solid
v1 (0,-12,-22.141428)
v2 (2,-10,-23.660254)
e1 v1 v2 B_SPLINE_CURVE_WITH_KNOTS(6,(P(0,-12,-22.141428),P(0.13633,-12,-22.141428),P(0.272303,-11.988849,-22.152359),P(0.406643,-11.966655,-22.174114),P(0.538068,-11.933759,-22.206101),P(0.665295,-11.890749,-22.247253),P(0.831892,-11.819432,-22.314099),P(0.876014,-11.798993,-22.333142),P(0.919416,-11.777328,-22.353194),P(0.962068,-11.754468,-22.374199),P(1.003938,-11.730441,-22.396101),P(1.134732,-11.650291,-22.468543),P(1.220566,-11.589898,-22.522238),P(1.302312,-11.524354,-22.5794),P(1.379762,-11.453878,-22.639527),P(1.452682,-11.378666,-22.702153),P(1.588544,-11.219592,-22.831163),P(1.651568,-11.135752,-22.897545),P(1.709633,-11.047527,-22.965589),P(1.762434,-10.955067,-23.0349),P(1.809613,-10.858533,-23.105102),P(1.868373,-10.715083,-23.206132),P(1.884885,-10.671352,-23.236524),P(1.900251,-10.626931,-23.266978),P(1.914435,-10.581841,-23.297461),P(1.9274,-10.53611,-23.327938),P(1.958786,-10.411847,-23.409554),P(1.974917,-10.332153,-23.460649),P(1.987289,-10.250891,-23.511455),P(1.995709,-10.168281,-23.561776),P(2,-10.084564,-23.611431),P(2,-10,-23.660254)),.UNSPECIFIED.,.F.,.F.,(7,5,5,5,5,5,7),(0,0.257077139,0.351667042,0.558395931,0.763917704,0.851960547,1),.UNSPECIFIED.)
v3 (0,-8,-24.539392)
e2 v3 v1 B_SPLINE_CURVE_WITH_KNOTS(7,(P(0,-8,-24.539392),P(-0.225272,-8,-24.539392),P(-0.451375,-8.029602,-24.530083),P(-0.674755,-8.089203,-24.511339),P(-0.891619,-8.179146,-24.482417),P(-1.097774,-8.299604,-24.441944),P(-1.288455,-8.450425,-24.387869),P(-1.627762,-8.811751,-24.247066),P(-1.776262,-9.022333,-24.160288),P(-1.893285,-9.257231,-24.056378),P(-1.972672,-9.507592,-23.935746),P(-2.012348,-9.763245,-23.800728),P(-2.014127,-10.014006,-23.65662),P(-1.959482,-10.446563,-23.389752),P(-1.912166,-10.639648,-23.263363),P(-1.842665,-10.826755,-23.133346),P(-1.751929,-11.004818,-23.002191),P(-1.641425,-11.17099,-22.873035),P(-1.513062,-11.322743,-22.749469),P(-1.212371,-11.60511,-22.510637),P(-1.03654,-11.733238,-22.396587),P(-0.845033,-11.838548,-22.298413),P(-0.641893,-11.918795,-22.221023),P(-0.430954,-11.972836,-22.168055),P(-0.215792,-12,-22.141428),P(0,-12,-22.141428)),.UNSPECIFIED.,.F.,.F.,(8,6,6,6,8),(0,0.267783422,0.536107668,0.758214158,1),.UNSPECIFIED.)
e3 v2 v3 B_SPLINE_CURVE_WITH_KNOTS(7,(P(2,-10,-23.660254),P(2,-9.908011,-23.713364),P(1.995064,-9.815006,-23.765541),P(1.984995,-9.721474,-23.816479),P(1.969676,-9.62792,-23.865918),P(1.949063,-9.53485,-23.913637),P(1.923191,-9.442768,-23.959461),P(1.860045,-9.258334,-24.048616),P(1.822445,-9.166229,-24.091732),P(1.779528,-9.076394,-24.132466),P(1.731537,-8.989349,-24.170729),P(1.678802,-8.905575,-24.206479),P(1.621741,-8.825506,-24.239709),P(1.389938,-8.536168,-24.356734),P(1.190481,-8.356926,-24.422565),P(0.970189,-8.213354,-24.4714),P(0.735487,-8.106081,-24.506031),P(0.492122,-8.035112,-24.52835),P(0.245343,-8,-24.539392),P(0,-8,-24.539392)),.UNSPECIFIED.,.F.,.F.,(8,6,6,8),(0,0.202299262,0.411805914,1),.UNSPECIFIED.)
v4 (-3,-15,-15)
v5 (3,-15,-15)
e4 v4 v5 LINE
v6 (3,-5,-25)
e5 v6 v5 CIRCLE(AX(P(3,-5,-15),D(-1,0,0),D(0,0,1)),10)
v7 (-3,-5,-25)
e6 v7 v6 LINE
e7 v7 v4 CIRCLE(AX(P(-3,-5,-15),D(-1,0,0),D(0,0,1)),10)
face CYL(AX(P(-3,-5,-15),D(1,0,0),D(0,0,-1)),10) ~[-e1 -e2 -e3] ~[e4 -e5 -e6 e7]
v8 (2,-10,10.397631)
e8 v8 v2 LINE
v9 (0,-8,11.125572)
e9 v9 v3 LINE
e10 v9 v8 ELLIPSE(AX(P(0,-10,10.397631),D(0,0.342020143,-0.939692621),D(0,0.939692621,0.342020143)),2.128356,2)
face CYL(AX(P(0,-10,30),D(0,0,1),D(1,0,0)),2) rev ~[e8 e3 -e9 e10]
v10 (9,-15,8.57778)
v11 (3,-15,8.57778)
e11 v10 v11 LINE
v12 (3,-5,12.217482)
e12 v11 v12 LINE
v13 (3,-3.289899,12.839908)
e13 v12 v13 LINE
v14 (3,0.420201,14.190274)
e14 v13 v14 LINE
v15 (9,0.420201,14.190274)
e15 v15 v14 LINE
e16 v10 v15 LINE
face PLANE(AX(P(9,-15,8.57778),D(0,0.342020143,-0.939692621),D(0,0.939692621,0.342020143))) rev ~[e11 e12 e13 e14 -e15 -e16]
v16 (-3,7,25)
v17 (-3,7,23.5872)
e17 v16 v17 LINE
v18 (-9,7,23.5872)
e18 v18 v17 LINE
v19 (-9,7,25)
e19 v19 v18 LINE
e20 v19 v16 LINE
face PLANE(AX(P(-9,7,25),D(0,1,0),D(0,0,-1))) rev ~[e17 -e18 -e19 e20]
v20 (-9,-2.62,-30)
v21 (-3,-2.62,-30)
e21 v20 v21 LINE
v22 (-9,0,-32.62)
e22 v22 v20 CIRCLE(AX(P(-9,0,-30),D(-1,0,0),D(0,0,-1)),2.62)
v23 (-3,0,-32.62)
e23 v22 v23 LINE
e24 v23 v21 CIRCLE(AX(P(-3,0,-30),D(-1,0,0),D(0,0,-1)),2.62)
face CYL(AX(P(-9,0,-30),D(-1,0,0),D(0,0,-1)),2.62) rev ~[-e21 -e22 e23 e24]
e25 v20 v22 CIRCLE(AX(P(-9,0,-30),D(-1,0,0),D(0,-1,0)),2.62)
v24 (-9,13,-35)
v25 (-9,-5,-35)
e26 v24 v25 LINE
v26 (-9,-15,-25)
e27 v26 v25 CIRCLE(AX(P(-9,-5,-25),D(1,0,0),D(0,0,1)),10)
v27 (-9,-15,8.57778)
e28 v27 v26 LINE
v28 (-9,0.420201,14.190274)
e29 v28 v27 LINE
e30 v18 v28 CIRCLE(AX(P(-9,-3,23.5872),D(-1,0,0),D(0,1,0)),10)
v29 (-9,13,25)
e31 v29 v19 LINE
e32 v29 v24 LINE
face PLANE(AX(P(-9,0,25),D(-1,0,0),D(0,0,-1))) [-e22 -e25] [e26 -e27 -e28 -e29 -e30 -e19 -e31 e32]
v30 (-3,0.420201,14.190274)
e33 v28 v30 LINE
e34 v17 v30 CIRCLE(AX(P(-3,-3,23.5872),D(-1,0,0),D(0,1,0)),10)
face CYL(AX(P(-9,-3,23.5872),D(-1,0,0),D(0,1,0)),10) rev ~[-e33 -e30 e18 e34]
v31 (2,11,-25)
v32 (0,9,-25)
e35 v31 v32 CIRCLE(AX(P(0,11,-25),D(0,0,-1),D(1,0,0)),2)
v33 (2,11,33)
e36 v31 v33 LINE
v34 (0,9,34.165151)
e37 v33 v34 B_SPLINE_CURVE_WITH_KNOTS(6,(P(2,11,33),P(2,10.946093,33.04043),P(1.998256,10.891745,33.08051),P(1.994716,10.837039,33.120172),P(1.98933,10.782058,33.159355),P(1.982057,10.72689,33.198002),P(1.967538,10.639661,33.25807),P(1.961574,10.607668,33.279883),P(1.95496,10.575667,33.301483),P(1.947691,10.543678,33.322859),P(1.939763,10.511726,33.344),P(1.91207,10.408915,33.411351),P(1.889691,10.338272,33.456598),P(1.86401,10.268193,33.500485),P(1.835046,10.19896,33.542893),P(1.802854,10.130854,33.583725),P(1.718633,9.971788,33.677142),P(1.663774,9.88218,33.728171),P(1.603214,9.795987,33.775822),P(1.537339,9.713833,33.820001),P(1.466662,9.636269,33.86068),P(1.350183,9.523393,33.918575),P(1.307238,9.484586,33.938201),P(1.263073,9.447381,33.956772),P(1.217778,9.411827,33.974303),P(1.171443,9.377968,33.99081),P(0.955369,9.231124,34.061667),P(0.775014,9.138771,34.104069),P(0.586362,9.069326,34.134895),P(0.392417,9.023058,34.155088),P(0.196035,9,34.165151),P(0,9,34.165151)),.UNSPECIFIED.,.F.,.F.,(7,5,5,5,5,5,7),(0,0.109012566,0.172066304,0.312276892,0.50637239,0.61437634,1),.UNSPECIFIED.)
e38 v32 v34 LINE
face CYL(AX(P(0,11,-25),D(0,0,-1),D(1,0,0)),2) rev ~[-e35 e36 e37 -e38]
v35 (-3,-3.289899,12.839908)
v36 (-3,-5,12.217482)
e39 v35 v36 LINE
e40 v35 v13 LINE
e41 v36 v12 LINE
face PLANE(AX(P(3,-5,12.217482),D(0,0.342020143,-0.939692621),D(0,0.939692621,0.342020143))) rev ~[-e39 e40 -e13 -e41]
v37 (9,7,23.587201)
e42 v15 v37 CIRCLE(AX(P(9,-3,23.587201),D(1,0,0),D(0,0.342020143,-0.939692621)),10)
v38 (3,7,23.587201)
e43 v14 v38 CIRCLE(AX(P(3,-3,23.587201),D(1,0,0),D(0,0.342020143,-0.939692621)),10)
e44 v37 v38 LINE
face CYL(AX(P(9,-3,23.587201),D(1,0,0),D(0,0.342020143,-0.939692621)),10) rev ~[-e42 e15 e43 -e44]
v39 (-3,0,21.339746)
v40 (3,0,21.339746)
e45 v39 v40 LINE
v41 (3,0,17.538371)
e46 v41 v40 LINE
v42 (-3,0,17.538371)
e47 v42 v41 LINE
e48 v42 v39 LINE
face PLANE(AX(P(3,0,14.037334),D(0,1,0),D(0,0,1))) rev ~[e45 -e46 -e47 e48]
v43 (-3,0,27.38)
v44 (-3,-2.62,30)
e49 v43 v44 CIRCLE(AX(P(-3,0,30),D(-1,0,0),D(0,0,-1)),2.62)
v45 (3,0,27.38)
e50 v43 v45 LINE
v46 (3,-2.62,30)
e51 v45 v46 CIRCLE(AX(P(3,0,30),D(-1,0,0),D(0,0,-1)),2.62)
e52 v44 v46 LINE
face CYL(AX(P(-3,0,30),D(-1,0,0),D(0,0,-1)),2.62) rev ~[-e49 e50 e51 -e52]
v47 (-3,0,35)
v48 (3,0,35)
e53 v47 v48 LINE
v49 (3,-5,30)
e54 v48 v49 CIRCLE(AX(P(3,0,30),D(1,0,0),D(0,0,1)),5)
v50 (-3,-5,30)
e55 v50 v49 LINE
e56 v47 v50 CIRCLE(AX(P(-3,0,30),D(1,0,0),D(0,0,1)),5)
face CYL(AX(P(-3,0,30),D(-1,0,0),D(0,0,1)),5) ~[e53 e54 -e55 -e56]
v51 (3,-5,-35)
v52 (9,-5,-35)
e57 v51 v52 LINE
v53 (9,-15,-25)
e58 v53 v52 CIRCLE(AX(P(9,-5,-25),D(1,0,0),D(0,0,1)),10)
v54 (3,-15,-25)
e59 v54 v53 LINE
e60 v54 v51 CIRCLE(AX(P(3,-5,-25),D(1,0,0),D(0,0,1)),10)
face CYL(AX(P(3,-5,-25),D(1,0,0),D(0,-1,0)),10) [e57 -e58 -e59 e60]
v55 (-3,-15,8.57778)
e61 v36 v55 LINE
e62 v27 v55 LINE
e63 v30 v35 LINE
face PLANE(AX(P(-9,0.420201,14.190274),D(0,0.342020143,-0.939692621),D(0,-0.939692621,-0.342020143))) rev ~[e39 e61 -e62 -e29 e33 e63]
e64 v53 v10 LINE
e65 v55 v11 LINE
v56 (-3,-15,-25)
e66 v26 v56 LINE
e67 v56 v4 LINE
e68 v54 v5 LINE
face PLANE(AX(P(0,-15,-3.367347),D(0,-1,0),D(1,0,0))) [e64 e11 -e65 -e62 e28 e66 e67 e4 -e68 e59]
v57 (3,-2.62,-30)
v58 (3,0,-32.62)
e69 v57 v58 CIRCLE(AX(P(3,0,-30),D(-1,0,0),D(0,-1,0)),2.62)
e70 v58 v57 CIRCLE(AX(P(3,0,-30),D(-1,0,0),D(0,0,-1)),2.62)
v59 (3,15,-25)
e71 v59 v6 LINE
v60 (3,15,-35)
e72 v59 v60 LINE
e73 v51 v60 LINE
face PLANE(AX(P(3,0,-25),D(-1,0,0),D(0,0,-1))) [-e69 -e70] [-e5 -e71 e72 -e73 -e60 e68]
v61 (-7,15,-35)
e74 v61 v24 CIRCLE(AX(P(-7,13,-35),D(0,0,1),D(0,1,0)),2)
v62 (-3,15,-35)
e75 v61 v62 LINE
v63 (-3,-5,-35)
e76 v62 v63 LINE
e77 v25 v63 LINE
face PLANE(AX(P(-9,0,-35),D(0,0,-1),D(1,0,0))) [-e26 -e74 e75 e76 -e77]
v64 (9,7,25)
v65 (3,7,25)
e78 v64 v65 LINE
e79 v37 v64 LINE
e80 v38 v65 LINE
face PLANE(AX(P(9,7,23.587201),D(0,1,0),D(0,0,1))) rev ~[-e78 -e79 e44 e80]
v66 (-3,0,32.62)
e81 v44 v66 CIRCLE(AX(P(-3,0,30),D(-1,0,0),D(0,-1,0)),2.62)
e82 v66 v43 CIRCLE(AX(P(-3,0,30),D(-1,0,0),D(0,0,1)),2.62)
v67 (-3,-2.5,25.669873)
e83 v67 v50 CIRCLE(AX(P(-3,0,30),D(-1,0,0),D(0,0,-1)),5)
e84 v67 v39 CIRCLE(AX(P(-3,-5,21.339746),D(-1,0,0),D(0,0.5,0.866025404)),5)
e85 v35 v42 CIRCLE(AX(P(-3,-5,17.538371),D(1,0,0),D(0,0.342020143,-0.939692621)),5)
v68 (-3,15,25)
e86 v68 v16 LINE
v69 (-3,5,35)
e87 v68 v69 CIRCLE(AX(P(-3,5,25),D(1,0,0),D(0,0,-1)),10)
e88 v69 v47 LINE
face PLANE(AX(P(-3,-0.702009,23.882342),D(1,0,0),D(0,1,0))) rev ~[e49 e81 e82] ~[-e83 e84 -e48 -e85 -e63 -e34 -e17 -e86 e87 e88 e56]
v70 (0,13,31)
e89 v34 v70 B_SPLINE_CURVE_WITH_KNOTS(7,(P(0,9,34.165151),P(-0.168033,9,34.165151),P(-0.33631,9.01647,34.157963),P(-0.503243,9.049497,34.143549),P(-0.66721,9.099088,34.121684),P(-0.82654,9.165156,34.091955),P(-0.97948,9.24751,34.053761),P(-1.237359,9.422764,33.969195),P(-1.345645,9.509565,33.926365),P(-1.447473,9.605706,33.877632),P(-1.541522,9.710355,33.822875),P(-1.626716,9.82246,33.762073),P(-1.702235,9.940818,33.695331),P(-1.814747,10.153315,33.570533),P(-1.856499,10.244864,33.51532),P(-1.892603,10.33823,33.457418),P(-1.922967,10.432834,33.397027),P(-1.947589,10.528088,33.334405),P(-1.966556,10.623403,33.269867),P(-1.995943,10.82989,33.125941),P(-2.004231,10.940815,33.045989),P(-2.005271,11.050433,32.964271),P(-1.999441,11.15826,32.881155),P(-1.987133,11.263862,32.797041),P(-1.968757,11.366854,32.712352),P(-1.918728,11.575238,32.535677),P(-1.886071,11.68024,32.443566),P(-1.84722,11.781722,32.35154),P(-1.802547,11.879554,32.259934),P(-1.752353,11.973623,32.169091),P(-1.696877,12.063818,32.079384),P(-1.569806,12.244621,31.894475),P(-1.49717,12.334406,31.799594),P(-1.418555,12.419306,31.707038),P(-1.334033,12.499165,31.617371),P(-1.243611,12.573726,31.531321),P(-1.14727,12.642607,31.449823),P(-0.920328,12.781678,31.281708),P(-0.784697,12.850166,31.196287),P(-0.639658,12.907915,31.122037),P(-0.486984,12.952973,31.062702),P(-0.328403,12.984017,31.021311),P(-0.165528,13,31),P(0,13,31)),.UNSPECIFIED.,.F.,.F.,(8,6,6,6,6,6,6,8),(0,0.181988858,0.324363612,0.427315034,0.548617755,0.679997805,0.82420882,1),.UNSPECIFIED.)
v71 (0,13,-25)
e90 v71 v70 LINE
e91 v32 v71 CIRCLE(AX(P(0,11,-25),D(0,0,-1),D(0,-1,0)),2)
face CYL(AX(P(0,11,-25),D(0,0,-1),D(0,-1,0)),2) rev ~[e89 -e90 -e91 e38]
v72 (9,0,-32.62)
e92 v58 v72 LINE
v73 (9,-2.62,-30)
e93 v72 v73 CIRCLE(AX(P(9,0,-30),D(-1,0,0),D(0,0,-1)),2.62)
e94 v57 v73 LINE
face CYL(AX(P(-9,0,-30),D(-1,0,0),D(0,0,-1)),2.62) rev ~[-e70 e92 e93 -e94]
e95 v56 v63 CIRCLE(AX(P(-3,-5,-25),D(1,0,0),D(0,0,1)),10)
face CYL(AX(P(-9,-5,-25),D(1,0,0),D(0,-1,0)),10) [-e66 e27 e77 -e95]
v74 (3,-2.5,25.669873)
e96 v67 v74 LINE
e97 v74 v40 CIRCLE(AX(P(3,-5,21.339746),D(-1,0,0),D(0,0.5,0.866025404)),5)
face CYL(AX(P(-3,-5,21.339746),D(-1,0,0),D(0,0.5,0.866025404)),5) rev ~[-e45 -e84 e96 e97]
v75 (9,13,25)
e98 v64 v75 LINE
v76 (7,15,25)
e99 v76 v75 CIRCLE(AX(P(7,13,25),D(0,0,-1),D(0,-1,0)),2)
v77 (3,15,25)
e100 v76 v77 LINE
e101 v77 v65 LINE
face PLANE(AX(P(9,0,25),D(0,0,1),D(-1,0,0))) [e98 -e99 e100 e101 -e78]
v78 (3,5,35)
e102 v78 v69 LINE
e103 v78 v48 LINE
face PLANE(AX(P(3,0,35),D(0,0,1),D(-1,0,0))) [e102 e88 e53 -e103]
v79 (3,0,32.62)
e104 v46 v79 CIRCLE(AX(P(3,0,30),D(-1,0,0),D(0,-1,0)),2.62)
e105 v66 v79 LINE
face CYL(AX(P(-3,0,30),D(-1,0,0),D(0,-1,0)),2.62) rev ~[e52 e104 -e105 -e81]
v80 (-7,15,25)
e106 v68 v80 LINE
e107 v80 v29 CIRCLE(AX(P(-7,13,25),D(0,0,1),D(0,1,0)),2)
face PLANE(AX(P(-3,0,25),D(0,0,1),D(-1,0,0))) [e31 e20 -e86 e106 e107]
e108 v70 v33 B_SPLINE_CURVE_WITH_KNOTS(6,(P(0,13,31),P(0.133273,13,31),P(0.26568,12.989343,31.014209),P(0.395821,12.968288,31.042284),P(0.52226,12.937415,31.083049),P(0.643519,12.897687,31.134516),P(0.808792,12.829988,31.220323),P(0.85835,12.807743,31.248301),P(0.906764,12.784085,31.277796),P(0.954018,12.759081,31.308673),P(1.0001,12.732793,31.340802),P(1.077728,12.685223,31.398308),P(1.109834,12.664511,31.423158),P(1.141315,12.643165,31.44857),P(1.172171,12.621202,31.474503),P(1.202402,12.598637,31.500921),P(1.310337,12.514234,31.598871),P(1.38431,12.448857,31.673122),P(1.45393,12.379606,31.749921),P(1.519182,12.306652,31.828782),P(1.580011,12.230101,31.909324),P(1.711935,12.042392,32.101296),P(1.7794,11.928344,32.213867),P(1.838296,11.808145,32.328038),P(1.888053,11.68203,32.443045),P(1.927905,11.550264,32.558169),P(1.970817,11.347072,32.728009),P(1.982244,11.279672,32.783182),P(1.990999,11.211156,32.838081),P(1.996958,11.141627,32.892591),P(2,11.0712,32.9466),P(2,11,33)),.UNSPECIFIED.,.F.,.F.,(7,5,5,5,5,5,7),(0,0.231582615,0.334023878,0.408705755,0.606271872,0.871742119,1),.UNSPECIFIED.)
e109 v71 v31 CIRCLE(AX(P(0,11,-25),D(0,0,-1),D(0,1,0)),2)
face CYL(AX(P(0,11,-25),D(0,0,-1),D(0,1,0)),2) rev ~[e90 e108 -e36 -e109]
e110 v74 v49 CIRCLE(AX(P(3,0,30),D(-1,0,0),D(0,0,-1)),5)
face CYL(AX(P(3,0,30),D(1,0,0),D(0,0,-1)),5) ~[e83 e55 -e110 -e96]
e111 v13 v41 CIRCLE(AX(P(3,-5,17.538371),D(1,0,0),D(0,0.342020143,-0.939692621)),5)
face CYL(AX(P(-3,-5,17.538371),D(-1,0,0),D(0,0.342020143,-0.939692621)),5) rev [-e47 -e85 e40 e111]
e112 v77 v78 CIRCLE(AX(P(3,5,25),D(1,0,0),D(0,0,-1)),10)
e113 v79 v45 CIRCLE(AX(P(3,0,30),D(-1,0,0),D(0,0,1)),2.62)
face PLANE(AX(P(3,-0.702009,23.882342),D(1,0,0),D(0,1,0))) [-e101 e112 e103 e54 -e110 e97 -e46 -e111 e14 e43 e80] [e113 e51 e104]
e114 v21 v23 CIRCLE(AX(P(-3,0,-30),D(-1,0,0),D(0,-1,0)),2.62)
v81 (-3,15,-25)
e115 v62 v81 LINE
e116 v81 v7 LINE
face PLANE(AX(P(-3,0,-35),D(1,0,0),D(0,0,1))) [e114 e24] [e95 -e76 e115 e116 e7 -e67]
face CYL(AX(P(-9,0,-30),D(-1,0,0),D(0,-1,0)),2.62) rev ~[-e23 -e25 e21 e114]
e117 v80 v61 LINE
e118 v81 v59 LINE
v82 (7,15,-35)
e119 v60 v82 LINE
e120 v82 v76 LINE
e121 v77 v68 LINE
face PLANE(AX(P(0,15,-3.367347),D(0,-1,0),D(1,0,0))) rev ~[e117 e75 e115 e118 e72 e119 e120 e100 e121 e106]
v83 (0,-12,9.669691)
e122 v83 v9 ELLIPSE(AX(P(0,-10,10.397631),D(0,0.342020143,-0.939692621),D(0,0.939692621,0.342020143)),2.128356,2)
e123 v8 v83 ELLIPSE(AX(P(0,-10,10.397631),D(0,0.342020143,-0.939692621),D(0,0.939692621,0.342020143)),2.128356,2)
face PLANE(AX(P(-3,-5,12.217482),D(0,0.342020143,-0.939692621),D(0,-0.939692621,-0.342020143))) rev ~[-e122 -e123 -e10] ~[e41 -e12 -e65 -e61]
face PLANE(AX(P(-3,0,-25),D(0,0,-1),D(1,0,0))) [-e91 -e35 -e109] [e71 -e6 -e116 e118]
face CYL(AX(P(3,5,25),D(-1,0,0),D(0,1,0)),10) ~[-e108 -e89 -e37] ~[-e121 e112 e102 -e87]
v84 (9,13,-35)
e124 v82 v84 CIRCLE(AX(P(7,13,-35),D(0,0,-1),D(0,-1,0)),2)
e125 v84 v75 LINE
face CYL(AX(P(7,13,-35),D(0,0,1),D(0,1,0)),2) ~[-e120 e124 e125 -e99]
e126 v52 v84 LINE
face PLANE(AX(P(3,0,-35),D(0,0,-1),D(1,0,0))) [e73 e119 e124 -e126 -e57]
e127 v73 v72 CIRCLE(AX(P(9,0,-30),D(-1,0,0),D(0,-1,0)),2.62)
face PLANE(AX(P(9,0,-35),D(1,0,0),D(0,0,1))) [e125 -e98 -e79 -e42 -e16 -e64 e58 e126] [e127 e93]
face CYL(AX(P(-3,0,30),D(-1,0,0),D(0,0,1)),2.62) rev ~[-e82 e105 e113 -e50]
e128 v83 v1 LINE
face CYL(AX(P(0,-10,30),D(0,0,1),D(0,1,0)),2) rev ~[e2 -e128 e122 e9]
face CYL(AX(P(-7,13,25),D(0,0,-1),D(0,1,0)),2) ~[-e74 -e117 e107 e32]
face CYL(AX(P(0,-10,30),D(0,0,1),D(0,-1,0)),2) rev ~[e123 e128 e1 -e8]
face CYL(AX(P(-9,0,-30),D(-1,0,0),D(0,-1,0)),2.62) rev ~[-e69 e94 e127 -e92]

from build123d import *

# Parameters (mm, degrees)
F1_DEPTH     = 15
F3_DEPTH     = 6
F5_DEPTH     = 18
F6_R         = 10
F9_DEPTH     = 6
F10_DEPTH    = 6
F11_R        = 2
F13_DEPTH    = 6
F15_R        = 10
F19_DEPTH    = 65.001
F21_DEPTH    = 60.001
F23_DEPTH    = 6
F24_T1_DEPTH = 6


# Not quite as in the source:
# - a fillet or chamfer that OpenCascade refuses, or shapes differently, is made with other operations: its cross-section is extruded or revolved along the edge and cut away or added


with BuildPart() as f1:
    # F0 (on Front) → F1 (new body, symmetric)
    with BuildSketch(Plane.XZ):
        Polygon((9, -25), (9, 25), (3, 25), (3, 35), (-3, 35), (-3, 25), (-9, 25), (-9, -25), (-9, -35), (-3, -35), (-3, -25), (3, -25), (3, -35), (9, -35), align=None)
    extrude(amount=F1_DEPTH, both=True)

    # F2 (on face) → F3 (cut)
    with BuildSketch(Plane(origin=(-3, 0, 0), x_dir=(0, -1, 0), z_dir=(-1, 0, 0))):
        with BuildLine():
            ThreePointArc((0, 32.62), (-2.62, 30), (0, 27.38))
            Line((0, 27.38), (0, 32.62))
        make_face()
        with BuildLine():
            Line((0, 32.62), (0, 27.38))
            ThreePointArc((0, 27.38), (1.8526197667, 28.1473802333), (2.62, 30))
            ThreePointArc((2.62, 30), (1.8526197667, 31.8526197667), (0, 32.62))
        make_face()
    extrude(amount=-F3_DEPTH, mode=Mode.SUBTRACT)

    # F4 (on face) → F5 (cut)
    with BuildSketch(Plane(origin=(-9, 0, 0), x_dir=(0, -1, 0), z_dir=(-1, 0, 0))):
        with BuildLine():
            ThreePointArc((0, -32.62), (1.8526197667, -31.8526197667), (2.62, -30))
            ThreePointArc((2.62, -30), (-1.8526197667, -28.1473802333), (0, -32.62))
        make_face()
    extrude(amount=-F5_DEPTH, mode=Mode.SUBTRACT)

    # F6
    f6_edges = [f1.edges().sort_by_distance(p)[0] for p in [
        (0, 15, 35),
        (0, -15, 35),
        (6, -15, -35),
        (-6, -15, -35),
    ]]
    fillet(f6_edges, radius=F6_R)

    # F8 (on face) → F9 (cut)
    with BuildSketch(Plane(origin=(-9, 0, 0), x_dir=(0, -1, 0), z_dir=(-1, 0, 0))):
        with BuildLine():
            ThreePointArc((-7, 23.5872004348), (-5.1915204429, 17.8514360713), (-0.4202014333, 14.190274227))
            Line((-0.4202014333, 14.190274227), (15, 8.5777798989))
            Line((15, 8.5777798989), (15, 25))
            Line((15, 25), (-7, 25))
            Line((-7, 25), (-7, 23.5872004348))
        make_face()
    extrude(amount=-F9_DEPTH, mode=Mode.SUBTRACT)

    # F7 (on face) → F10 (cut)
    with BuildSketch(Plane.YZ.offset(9)):
        with BuildLine():
            Line((7, 25), (-15, 25))
            Line((-15, 25), (-15, 8.57778))
            Line((-15, 8.57778), (0.4202014333, 14.1902743281))
            ThreePointArc((0.4202014333, 14.1902743281), (5.1915204429, 17.8514361724), (7, 23.587200536))
            Line((7, 23.587200536), (7, 25))
        make_face()
    extrude(amount=-F10_DEPTH, mode=Mode.SUBTRACT)

    # F11
    f11_edges = [f1.edges().sort_by_distance(p)[0] for p in [
        (9, 15, -5),
        (-9, 15, -5),
    ]]
    fillet(f11_edges, radius=F11_R)

    # F12 (on face) → F13 (cut)
    with BuildSketch(Plane(origin=(-3, 0, 0), x_dir=(0, -1, 0), z_dir=(-1, 0, 0))):
        with BuildLine():
            Line((5, 35), (0, 35))
            ThreePointArc((0, 35), (3.5355339059, 33.5355339059), (5, 30))
            Line((5, 30), (5, 12.2174822415))
            Line((5, 12.2174822415), (15, 8.5777798989))
            Line((15, 8.5777798989), (15, 25))
            ThreePointArc((15, 25), (12.0710678119, 32.0710678119), (5, 35))
        make_face()
    extrude(amount=-F13_DEPTH, mode=Mode.SUBTRACT)

    # F15
    f15_edges = [f1.edges().sort_by_distance(p)[0] for p in [
        (0, -15, -25),
    ]]
    fillet(f15_edges, radius=F15_R)

    # F18 (on face) → F19 (cut, through all)
    with BuildSketch(Plane.XY.offset(30)):
        with BuildLine():
            ThreePointArc((2, -10), (1.4142135624, -8.5857864376), (0, -8))
            Line((0, -8), (0, -12))
            ThreePointArc((0, -12), (1.4142135624, -11.4142135624), (2, -10))
        make_face()
        with BuildLine():
            Line((0, -12), (0, -8))
            ThreePointArc((0, -8), (-2, -10), (0, -12))
        make_face()
    extrude(amount=-F19_DEPTH, mode=Mode.SUBTRACT)

    # F20 (on face) → F21 (cut, through all)
    with BuildSketch(Plane(origin=(0, 0, -25), x_dir=(1, 0, 0), z_dir=(0, 0, -1))):
        with BuildLine():
            ThreePointArc((0, -9), (-2, -11), (0, -13))
            Line((0, -13), (0, -11))
            Line((0, -11), (0, -9))
        make_face()
        with BuildLine():
            Line((0, -11), (0, -13))
            ThreePointArc((0, -13), (1.4142135624, -12.4142135624), (2, -11))
            ThreePointArc((2, -11), (1.4142135624, -9.5857864376), (0, -9))
            Line((0, -9), (0, -11))
        make_face()
    extrude(amount=-F21_DEPTH, mode=Mode.SUBTRACT)

    # F22 (on face) → F23 (cut)
    with BuildSketch(Plane.YZ.offset(3)):
        with BuildLine():
            ThreePointArc((0, 25), (-3.5355339059, 26.4644660941), (-5, 30))
            Line((-5, 30), (-5, 12.2174822415))
            Line((-5.0000000325, 12.2174823308), (0, 14.037333514))
            Line((0, 14.037333514), (0, 25))
        make_face()
    extrude(amount=-F23_DEPTH, mode=Mode.SUBTRACT)

    # F24: fillet of radius 5 on 2 edges, made by hand

    # F24_s2 → F24_t1 (join)
    with BuildSketch(Plane.YZ.offset(-3)):
        with BuildLine():
            ThreePointArc((-2.5, 25.6698729811), (-0.6698729811, 23.8397459622), (0, 21.3397459622))
            Line((0, 21.3397459622), (0, 25))
            ThreePointArc((0, 25), (-1.2940952255, 25.1703708686), (-2.5, 25.6698729811))
        make_face()
        with BuildLine():
            ThreePointArc((-3.2898992834, 12.8399081011), (-0.9042397786, 14.6704890233), (0, 17.538371205))
            Line((0, 17.538371205), (0, 14.037333514))
            Line((0, 14.037333514), (-3.2898992834, 12.8399081011))
        make_face()
    extrude(amount=F24_T1_DEPTH)


solid = f1.part
